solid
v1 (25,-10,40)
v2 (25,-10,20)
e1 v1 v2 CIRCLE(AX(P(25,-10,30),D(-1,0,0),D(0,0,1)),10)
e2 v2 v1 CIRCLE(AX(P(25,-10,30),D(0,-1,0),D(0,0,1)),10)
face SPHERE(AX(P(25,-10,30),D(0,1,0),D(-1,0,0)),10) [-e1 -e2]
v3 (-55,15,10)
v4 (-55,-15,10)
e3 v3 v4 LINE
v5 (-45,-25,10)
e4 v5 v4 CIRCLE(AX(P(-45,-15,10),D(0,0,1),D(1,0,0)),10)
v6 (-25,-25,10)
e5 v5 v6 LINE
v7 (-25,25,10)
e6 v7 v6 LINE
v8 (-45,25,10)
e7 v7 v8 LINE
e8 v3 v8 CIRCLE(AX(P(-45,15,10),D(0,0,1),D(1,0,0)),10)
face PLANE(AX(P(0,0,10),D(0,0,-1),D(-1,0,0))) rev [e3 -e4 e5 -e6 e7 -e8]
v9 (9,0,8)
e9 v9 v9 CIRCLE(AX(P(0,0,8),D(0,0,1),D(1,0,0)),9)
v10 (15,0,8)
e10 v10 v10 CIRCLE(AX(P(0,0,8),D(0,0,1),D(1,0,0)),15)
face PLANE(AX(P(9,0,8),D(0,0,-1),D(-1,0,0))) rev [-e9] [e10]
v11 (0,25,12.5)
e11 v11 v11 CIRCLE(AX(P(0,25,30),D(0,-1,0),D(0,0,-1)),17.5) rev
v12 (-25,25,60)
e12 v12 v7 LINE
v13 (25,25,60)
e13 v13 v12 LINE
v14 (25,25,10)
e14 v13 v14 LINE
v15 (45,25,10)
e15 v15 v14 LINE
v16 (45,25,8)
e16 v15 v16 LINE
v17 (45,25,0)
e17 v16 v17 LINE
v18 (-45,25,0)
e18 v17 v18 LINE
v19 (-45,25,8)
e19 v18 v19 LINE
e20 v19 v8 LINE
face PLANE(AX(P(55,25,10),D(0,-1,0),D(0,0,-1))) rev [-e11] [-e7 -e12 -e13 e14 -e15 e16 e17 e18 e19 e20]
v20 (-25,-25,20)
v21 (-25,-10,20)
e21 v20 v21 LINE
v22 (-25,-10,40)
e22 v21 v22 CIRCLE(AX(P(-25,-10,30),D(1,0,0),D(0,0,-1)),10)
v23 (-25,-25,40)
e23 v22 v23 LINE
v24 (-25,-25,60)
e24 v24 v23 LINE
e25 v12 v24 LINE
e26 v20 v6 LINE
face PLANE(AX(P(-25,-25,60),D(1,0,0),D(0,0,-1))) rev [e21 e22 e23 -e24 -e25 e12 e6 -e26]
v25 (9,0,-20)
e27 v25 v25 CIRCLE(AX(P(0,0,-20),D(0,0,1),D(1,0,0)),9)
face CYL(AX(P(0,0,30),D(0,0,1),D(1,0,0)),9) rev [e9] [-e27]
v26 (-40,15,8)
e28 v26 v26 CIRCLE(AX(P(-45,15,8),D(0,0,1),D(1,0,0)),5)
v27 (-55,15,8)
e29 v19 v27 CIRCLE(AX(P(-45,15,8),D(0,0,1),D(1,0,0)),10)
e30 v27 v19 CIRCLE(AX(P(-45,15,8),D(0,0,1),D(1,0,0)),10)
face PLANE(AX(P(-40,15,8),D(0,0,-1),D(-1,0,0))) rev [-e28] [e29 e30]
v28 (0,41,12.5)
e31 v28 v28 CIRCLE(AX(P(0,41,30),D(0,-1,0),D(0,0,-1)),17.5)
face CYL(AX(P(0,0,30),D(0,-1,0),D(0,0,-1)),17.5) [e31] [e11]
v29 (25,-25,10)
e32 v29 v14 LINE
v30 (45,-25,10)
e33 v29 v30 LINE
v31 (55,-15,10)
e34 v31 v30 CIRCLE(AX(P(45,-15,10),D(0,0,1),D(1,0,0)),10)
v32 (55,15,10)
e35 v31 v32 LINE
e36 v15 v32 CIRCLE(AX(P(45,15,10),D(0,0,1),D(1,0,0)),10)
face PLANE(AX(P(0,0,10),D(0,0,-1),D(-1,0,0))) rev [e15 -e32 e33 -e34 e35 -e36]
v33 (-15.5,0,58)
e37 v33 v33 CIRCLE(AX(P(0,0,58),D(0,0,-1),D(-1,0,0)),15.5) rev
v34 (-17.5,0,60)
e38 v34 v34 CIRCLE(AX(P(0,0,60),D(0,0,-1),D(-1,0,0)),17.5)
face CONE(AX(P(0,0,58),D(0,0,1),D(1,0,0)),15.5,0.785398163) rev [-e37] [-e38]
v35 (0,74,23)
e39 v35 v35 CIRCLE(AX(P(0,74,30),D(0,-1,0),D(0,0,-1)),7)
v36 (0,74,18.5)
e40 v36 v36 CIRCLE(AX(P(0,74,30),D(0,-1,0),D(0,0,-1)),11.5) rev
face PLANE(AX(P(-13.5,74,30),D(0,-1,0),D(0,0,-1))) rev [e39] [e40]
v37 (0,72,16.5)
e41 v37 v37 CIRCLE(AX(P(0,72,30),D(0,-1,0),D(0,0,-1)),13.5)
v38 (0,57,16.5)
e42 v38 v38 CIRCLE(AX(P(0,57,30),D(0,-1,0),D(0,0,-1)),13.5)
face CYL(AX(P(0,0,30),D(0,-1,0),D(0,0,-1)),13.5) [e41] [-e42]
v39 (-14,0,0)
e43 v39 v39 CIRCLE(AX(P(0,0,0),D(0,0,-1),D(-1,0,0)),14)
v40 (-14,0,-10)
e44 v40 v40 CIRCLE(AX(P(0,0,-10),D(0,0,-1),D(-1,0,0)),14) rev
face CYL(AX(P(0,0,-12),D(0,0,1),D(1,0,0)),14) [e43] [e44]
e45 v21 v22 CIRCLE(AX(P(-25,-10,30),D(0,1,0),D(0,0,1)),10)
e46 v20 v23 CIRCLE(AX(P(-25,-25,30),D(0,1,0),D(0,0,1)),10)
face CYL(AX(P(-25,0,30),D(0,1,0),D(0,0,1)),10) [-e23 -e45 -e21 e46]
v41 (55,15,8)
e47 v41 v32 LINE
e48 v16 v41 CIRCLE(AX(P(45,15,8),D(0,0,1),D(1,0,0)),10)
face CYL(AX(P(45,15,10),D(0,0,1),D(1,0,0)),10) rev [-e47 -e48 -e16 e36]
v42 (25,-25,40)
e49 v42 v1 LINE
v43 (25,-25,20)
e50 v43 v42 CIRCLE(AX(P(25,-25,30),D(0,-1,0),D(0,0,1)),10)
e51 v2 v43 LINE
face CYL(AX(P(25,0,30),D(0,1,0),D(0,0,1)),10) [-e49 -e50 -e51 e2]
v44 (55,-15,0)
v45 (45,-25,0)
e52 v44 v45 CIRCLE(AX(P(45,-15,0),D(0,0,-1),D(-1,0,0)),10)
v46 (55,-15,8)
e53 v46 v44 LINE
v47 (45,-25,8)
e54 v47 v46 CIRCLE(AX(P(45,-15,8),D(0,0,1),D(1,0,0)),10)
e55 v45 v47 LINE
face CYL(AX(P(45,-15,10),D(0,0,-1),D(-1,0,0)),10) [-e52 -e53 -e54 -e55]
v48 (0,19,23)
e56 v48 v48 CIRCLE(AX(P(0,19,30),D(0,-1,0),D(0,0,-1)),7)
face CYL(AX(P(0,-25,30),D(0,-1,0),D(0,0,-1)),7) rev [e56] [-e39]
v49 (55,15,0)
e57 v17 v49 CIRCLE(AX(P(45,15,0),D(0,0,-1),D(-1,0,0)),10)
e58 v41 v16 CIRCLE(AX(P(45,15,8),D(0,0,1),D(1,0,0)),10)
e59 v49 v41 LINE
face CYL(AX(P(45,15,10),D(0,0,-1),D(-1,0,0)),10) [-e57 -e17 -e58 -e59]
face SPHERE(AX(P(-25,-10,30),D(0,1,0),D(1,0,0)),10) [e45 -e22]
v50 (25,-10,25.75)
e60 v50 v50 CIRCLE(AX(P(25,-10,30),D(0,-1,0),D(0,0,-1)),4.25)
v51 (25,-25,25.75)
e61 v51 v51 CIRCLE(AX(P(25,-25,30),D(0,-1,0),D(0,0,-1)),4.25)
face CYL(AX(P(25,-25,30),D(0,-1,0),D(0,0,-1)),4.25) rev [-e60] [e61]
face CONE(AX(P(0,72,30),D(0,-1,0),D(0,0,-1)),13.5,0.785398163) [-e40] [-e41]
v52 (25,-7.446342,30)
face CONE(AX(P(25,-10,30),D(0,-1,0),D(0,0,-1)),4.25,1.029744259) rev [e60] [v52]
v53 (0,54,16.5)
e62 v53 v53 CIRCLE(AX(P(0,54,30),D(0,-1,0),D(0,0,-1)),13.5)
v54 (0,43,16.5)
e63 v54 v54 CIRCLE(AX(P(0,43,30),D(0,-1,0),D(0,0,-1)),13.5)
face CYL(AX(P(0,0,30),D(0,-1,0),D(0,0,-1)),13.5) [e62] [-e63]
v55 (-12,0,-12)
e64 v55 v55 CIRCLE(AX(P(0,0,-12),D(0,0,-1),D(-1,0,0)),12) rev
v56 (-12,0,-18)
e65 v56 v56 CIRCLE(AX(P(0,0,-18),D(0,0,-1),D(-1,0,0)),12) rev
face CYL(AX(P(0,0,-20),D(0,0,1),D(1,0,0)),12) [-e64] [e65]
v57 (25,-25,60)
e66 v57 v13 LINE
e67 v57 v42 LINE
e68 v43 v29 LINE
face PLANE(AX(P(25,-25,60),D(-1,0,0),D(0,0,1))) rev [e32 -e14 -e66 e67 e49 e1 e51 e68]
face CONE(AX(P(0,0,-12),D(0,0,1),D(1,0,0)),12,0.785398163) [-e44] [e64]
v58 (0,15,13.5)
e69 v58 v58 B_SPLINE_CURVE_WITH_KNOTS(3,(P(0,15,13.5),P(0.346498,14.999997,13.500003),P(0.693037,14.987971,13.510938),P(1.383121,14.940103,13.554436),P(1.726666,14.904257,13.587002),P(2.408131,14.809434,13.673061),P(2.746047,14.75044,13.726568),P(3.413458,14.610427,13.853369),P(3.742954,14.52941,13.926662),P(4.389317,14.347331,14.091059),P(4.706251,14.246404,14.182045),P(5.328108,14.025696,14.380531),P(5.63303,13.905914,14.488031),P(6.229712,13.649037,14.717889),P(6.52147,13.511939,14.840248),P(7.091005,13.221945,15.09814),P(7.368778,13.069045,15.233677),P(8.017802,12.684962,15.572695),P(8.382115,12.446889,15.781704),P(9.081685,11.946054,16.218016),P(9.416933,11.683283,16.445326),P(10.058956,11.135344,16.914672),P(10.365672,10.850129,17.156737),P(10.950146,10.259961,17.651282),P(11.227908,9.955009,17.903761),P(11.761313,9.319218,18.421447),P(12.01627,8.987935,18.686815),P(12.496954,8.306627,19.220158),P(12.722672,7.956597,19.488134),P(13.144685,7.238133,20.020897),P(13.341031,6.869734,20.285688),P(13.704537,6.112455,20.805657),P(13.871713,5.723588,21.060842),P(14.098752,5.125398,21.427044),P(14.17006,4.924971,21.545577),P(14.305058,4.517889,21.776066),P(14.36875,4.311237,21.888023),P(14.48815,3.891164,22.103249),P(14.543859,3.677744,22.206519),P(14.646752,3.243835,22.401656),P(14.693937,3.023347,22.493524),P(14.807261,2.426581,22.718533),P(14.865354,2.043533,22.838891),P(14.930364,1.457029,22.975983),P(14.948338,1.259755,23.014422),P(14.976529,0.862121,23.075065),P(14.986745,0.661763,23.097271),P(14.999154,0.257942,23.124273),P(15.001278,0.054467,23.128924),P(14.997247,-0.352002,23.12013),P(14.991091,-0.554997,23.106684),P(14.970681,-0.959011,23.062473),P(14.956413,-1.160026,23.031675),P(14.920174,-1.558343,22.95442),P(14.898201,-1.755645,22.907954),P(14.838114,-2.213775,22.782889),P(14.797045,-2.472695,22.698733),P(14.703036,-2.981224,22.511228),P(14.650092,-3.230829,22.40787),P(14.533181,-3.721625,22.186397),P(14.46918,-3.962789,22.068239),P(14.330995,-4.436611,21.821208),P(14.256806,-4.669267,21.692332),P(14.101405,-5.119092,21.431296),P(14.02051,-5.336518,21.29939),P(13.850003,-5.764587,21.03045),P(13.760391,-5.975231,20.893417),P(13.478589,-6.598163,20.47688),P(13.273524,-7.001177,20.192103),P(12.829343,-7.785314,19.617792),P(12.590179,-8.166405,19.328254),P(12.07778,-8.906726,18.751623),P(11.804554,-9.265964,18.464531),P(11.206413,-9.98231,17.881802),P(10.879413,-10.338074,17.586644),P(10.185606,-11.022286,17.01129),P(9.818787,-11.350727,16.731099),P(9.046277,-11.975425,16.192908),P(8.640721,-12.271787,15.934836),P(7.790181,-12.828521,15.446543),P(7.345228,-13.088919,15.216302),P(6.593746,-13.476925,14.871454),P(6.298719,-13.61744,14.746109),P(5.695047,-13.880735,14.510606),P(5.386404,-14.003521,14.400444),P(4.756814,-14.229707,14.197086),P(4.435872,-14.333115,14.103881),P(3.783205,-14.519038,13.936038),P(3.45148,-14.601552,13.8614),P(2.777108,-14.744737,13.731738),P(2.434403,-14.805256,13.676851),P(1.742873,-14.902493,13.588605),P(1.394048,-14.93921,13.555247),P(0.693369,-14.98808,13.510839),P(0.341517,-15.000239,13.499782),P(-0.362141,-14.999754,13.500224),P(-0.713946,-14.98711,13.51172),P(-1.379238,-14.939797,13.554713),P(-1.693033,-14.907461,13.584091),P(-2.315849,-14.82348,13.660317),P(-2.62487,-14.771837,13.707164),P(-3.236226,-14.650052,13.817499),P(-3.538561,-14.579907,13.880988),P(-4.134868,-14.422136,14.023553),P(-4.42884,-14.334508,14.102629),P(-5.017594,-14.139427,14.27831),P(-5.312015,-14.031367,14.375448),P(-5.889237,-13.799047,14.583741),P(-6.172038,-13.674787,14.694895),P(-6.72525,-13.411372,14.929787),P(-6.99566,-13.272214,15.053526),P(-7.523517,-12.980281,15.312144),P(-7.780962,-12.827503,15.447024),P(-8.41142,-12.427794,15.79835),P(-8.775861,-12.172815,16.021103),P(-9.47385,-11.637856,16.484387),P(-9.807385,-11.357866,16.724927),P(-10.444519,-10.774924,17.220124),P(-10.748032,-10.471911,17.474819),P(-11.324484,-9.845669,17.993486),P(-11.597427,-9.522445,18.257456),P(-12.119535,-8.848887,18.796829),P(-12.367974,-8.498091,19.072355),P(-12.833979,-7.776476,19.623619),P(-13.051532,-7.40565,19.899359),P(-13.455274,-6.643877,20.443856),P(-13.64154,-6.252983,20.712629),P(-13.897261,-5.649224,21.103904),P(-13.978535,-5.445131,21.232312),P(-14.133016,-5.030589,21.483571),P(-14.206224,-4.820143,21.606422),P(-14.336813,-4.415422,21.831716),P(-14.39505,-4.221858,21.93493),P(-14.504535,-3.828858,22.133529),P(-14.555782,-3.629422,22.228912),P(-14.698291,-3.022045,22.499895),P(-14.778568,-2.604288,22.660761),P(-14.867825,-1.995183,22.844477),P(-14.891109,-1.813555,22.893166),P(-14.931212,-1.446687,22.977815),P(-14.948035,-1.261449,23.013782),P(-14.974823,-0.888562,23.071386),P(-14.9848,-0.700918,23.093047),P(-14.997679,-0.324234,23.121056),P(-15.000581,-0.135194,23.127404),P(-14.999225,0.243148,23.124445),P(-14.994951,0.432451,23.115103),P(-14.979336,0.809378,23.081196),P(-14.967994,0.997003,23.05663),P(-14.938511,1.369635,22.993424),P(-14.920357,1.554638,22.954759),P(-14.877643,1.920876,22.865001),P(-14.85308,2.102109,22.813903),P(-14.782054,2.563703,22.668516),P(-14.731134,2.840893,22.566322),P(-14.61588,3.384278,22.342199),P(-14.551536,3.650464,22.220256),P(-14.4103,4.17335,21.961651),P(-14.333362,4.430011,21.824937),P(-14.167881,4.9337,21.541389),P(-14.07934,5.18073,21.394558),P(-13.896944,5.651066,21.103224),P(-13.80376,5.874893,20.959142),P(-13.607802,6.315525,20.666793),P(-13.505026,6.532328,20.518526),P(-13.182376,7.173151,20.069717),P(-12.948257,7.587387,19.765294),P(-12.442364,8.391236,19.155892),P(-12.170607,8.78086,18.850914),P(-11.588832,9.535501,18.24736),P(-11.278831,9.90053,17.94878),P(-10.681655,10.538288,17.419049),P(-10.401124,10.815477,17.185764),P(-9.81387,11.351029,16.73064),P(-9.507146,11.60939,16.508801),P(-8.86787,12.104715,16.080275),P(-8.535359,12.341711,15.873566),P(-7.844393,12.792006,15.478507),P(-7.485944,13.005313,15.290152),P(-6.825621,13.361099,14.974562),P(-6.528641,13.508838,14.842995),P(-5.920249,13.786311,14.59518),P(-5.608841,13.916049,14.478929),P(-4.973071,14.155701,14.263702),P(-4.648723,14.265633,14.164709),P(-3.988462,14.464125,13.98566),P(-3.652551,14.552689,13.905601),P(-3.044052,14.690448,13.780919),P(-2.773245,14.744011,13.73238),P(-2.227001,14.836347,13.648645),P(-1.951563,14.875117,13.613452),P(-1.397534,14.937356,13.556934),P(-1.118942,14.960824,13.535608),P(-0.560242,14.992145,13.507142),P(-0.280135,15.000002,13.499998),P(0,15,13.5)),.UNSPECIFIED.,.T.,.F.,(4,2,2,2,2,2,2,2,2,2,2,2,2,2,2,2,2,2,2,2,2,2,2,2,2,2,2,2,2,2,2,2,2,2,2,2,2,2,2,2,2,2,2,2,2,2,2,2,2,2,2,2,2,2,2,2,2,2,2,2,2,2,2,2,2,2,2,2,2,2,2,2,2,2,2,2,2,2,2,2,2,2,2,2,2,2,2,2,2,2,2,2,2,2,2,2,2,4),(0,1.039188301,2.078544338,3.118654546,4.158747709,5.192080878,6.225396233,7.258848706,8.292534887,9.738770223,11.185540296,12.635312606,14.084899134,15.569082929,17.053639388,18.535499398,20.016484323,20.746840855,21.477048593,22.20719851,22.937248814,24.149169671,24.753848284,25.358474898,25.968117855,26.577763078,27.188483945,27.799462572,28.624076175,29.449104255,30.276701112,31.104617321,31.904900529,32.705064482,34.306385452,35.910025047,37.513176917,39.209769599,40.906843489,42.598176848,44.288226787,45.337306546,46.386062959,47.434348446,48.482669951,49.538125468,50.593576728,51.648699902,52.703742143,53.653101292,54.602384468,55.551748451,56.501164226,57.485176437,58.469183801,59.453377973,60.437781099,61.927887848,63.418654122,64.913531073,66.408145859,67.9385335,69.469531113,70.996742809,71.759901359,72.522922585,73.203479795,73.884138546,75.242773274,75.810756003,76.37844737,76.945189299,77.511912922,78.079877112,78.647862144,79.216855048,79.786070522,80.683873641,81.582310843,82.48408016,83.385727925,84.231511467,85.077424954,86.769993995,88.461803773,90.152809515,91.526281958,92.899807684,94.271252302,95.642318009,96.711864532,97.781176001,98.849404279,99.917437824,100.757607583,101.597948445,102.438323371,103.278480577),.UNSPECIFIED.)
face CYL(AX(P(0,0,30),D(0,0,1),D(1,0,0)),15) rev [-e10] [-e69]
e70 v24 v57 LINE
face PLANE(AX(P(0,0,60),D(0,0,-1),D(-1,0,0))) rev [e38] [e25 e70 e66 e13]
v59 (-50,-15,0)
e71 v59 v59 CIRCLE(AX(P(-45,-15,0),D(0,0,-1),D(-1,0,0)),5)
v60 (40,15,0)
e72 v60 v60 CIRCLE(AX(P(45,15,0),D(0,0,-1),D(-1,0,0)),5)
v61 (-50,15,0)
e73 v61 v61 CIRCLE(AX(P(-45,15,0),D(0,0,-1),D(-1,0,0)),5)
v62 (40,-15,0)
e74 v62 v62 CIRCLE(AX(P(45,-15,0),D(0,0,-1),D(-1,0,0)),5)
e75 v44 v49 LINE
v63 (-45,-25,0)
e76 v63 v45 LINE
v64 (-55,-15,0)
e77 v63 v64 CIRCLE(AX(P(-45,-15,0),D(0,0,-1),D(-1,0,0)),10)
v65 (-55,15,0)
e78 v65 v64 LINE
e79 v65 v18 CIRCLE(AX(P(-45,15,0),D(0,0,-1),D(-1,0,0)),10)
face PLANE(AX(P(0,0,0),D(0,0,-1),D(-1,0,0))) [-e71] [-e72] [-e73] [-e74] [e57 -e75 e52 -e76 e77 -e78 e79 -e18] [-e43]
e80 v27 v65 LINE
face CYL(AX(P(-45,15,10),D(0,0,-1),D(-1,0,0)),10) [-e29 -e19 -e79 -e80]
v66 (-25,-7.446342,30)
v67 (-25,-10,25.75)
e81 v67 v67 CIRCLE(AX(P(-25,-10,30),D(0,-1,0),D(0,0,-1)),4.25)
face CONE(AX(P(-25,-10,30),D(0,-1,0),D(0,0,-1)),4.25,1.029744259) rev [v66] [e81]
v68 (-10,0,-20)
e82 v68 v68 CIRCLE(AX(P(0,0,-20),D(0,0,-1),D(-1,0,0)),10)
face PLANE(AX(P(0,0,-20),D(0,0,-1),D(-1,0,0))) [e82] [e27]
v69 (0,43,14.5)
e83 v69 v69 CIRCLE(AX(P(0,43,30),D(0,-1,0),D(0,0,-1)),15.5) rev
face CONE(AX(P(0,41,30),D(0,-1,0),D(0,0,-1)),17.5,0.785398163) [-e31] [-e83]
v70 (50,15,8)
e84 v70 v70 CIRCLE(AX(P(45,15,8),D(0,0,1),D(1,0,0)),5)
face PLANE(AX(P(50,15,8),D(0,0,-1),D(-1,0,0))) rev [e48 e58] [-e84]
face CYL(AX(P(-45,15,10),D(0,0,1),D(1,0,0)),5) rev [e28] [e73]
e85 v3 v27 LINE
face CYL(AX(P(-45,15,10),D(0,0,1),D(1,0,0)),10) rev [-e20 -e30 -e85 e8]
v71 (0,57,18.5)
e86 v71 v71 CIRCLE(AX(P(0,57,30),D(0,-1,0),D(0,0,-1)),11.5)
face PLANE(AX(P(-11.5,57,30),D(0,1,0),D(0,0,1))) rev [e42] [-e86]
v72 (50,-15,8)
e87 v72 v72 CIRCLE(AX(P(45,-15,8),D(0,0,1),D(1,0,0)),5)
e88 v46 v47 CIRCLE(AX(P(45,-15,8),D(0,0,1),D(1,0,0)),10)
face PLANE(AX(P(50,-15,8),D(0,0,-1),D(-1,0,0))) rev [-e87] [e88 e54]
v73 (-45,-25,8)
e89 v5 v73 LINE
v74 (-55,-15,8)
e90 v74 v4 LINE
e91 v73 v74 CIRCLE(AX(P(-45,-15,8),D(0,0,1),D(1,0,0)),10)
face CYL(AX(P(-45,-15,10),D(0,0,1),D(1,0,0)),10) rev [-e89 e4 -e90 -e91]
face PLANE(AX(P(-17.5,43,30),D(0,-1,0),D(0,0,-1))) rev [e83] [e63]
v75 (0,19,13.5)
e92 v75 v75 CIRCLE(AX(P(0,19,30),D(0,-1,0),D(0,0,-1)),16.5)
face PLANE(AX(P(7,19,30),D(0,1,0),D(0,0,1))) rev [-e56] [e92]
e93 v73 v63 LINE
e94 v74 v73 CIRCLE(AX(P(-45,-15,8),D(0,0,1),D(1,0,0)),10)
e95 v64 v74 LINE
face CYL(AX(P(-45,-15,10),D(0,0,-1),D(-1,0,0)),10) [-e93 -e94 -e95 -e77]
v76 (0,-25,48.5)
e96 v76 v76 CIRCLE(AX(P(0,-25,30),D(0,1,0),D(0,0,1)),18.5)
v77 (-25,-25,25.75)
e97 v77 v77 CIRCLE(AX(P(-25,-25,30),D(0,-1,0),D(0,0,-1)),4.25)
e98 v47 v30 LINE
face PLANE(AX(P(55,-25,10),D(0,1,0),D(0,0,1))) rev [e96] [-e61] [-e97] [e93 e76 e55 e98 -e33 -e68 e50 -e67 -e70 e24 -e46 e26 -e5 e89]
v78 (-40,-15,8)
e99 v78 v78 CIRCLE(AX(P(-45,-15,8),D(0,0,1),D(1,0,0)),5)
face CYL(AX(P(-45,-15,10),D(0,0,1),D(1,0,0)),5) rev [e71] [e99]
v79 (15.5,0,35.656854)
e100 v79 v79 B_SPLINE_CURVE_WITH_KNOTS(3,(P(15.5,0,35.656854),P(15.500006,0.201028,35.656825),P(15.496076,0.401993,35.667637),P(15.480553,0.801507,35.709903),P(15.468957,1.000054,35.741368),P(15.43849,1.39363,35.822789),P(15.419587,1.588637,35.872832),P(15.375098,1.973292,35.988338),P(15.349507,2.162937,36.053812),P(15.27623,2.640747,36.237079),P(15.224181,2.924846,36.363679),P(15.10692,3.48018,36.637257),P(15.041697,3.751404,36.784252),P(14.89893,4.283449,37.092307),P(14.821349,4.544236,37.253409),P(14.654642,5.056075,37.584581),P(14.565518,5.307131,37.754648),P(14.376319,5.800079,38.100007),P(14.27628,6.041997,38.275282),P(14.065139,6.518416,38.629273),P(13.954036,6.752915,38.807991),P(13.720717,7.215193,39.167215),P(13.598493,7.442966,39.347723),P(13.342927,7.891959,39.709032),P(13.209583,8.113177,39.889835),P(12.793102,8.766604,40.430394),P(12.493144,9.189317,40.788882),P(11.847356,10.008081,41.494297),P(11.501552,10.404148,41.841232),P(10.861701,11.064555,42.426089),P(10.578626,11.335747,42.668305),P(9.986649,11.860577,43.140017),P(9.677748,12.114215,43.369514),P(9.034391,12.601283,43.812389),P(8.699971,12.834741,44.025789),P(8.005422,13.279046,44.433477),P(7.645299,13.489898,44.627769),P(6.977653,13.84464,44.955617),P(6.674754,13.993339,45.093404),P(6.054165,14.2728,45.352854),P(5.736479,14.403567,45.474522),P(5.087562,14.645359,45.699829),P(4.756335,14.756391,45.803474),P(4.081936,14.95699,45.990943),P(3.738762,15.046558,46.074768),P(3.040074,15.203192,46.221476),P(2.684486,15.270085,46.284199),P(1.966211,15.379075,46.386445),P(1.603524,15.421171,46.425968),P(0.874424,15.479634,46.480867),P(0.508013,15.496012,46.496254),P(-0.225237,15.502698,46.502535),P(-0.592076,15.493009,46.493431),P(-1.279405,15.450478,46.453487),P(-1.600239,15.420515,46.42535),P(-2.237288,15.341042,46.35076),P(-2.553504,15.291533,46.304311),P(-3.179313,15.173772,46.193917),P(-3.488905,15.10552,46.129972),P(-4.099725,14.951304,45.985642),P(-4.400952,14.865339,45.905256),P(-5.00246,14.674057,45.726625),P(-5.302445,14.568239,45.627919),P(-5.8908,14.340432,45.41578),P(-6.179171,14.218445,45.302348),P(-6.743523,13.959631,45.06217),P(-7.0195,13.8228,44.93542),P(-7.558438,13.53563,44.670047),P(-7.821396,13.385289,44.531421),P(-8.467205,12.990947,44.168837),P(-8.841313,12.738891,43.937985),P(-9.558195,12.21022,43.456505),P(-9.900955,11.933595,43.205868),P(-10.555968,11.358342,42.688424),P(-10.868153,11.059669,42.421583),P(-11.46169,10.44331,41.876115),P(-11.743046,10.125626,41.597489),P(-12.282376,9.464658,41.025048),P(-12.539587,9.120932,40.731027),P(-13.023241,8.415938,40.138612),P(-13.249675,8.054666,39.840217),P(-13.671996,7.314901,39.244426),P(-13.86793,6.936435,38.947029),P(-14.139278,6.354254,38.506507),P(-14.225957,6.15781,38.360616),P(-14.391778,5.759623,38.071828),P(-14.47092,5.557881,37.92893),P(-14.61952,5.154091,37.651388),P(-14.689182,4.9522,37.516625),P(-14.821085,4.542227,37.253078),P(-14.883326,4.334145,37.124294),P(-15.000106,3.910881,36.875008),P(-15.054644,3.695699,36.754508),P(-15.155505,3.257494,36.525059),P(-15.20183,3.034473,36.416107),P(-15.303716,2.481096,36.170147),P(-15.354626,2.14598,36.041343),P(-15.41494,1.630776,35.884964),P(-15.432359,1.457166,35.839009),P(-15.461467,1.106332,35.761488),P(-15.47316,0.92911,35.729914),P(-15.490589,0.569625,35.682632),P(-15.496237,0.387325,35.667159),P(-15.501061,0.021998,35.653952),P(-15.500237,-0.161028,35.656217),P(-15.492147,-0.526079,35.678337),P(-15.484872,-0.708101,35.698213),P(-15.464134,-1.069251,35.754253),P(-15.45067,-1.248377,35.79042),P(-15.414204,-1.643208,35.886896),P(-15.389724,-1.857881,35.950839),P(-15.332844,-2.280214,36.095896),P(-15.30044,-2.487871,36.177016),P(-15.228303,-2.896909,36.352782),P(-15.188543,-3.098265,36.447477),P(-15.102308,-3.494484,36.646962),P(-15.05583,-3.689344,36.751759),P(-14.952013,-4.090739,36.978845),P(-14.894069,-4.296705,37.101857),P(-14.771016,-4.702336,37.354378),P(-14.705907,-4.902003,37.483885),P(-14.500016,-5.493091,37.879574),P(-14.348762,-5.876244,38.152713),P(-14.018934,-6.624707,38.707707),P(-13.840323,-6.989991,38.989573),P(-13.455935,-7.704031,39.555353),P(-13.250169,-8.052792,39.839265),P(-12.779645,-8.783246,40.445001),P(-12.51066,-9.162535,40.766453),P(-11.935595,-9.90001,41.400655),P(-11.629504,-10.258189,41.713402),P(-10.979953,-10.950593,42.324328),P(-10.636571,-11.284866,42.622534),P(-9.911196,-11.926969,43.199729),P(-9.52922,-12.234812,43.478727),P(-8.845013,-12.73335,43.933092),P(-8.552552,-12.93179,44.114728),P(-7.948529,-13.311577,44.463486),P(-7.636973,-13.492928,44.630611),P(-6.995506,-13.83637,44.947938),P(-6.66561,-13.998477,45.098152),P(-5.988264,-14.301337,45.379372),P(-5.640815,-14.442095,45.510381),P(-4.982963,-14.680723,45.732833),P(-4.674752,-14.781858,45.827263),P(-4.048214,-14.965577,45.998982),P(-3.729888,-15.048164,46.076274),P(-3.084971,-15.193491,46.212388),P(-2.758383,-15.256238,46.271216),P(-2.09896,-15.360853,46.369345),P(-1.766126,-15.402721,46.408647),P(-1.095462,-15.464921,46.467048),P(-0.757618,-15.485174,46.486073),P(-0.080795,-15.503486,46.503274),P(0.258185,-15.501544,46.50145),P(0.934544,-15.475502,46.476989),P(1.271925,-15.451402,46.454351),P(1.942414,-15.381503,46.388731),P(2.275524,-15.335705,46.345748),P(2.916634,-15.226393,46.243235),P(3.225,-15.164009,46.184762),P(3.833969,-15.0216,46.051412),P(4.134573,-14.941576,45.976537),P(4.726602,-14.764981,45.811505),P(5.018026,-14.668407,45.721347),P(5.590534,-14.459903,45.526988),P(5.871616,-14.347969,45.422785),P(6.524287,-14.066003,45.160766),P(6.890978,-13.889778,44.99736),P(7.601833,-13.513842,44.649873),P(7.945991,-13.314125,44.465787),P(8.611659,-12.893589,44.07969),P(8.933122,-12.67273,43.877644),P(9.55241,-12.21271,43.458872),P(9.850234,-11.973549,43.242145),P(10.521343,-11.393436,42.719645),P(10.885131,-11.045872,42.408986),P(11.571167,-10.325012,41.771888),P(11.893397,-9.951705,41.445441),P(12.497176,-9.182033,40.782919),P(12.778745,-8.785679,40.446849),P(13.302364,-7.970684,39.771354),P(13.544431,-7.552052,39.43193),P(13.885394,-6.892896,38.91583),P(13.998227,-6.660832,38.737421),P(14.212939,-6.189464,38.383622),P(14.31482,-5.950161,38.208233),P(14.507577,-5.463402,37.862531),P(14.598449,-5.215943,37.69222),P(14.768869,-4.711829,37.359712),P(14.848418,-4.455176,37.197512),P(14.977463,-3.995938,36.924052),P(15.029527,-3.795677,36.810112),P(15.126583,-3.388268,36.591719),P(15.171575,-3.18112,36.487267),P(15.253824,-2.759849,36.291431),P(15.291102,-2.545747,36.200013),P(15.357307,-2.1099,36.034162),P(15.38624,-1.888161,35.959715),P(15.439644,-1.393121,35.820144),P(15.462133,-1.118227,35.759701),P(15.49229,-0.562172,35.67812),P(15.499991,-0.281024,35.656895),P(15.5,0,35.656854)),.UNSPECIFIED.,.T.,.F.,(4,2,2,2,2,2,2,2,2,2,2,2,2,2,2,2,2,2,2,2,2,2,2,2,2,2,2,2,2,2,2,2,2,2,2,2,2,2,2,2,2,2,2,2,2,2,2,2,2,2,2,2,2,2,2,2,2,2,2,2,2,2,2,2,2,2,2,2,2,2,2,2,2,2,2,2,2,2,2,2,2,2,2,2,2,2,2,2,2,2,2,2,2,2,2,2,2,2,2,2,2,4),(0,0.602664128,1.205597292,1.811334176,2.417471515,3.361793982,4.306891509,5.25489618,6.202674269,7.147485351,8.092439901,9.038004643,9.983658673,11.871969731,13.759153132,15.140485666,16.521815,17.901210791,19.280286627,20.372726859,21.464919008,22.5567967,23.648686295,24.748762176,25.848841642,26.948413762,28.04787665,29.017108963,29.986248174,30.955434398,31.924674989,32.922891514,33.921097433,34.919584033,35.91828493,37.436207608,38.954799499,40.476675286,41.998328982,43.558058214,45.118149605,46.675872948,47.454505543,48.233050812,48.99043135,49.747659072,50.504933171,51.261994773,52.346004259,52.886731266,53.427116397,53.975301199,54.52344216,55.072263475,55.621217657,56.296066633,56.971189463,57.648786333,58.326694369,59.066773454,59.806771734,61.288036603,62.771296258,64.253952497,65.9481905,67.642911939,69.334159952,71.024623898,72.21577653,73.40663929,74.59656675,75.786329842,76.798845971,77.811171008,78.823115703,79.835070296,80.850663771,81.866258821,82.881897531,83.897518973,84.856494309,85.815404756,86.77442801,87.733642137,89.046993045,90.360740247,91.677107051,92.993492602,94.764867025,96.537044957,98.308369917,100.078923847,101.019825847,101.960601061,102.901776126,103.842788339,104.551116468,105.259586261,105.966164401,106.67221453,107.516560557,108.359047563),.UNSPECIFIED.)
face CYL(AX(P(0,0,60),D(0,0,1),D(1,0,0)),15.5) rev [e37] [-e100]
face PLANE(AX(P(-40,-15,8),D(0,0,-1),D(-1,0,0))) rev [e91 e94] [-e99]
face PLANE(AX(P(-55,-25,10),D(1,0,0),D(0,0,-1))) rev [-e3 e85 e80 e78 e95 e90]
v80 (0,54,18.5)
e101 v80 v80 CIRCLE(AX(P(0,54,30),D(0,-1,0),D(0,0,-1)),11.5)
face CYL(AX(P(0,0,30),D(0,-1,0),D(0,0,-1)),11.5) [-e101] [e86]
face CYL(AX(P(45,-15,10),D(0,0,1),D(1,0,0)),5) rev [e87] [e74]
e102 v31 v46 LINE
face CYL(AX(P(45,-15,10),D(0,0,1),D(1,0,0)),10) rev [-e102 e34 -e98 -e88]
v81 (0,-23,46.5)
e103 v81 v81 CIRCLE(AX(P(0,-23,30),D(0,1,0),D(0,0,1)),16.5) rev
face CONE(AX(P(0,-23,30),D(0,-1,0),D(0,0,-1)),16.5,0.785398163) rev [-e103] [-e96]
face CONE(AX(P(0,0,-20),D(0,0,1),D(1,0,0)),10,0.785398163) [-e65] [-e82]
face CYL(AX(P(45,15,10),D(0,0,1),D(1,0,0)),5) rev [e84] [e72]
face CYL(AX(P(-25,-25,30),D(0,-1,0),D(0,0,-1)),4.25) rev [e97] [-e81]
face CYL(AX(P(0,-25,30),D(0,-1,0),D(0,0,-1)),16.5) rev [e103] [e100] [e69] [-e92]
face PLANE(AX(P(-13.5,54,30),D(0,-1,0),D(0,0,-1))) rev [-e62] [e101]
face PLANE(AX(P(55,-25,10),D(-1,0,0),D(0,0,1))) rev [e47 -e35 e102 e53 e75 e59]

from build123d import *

# Parameters (mm, degrees)
SKETCH1_W                   = 50
SKETCH1_H                   = 110
BOSS_EXTRUDE1_DEPTH         = 10
FILLET1_R                   = 10
SKETCH3_W                   = 50
SKETCH3_H                   = 50
BOSS_EXTRUDE2_DEPTH         = 60
SKETCH4_R                   = 14
BOSS_EXTRUDE3_DEPTH         = 12
SKETCH5_R                   = 12
BOSS_EXTRUDE4_DEPTH         = 20
HOLE1_D                     = 10
HOLE1_CBORE_D               = 20
HOLE1_CBORE_DEPTH           = 2
HOLE2_D                     = 14
HOLE2_CBORE_D               = 33
HOLE2_CBORE_DEPTH           = 44
M33X2_0_TAPPED_HOLE1_REACH  = 124.07
M33X2_0_TAPPED_HOLE1_BORE_R = 15.5
HOLE4_D                     = 18
HOLE4_CBORE_D               = 30
HOLE4_CBORE_DEPTH           = 22
CHAMFER3_SIZE               = 2


with BuildPart() as part:
    # Sketch1 → Boss-Extrude1 (new body)
    with BuildSketch(Plane(origin=(0, 0, 0), x_dir=(0, 1, 0), z_dir=(0, 0, 1))):
        Rectangle(SKETCH1_W, SKETCH1_H)
    extrude(amount=BOSS_EXTRUDE1_DEPTH)

    # Fillet1
    fillet1_edges = [part.edges().sort_by_distance(p)[0] for p in [
        (55, 25, 5),
        (55, -25, 5),
        (-55, -25, 5),
        (-55, 25, 5),
    ]]
    fillet(fillet1_edges, radius=FILLET1_R)

    # Sketch3 → Boss-Extrude2 (add)
    with BuildSketch(Plane(origin=(0, 0, 0), x_dir=(0, 1, 0), z_dir=(0, 0, 1))):
        Rectangle(SKETCH3_W, SKETCH3_H)
    extrude(amount=BOSS_EXTRUDE2_DEPTH)

    # Sketch4 → Boss-Extrude3 (add)
    with BuildSketch(Plane(origin=(0, 0, 0), x_dir=(1, 0, 0), z_dir=(0, 0, -1))):
        with Locations(Location((0, 0, 0), (0, 0, 180))):
            Circle(SKETCH4_R)
    extrude(amount=BOSS_EXTRUDE3_DEPTH)

    # Sketch5 → Boss-Extrude4 (add)
    with BuildSketch(Plane(origin=(0, 0, 0), x_dir=(1, 0, 0), z_dir=(0, 0, -1))):
        with Locations(Location((0, 0, 0), (0, 0, 180))):
            Circle(SKETCH5_R)
    extrude(amount=BOSS_EXTRUDE4_DEPTH)

    # Sketch7 → Revolve1 (revolve)
    with BuildSketch(Plane(origin=(0, 0, 30), x_dir=(0, 1, 0), z_dir=(0, 0, 1)), mode=Mode.PRIVATE) as revolve1_sk:
        Polygon((25, 17.5), (43, 17.5), (43, 13.5), (54, 13.5), (54, 11.5), (57, 11.5), (57, 13.5), (74, 13.5), (74, 0), (25, 0), align=None)
    revolve(revolve1_sk.sketch.rotate(Axis((0, 0, 30), (0, 1, 0)), 270), axis=Axis((0, 0, 30), (0, 1, 0)))

    # Hole1 (through all)
    with Locations(Plane.XY.offset(10)):
        with Locations((-45, -15), (-45, 15)):
            hole1 = CounterBoreHole(HOLE1_D / 2, HOLE1_CBORE_D / 2, HOLE1_CBORE_DEPTH)

    # Mirror1: Hole1 across plane
    add(hole1.mirror(Plane(origin=(0, 0, 0), x_dir=(0, 0, 1), z_dir=(1, 0, 0))), mode=Mode.SUBTRACT)

    # Sketch12 → Revolve2 (revolve)
    with BuildSketch(Plane(origin=(0, 0, 30), x_dir=(0, 1, 0), z_dir=(0, 0, 1))):
        with BuildLine():
            Line((-25, 35), (-10, 35))
            ThreePointArc((-10, 35), (-2.928932188, 32.071067812), (0, 25))
            Line((0, 25), (-25, 25))
            Line((-25, 25), (-25, 35))
        make_face()
    revolve2 = revolve(axis=Axis((-25, 0, 30), (0, -1, 0)))

    # Mirror2: Revolve2 across plane
    add(revolve2.mirror(Plane(origin=(0, 0, 0), x_dir=(0, 0, 1), z_dir=(1, 0, 0))))

    # Hole2 (through all)
    with Locations(Plane.XZ.offset(25)):
        with Locations((0, 30)):
            CounterBoreHole(HOLE2_D / 2, HOLE2_CBORE_D / 2, HOLE2_CBORE_DEPTH)

    # Sketch16 → M10 Tapped Hole1 (revolve, cut)
    with BuildSketch(Plane(origin=(-25, -25, 30), x_dir=(0, 0, -1), z_dir=(1, 0, 0))):
        Polygon((0, 0), (0, 17.553657631), (4.25, 15), (4.25, 0), align=None)
    m10_tapped_hole1 = revolve(axis=Axis((-25, -31.35, 30), (0, 1, 0)), mode=Mode.SUBTRACT)

    # Mirror4: M10 Tapped Hole1 across plane
    add(m10_tapped_hole1.mirror(Plane(origin=(0, 0, 0), x_dir=(0, 0, 1), z_dir=(1, 0, 0))), mode=Mode.SUBTRACT)

    # M33x2.0 Tapped Hole1 bore → M33x2.0 Tapped Hole1 (cut, up to next)
    with BuildSketch(Plane.XY.offset(60), mode=Mode.PRIVATE) as m33x2_0_tapped_hole1_sk1:
        Circle(M33X2_0_TAPPED_HOLE1_BORE_R)
    m33x2_0_tapped_hole1_tool1 = extrude(m33x2_0_tapped_hole1_sk1.sketch, amount=-M33X2_0_TAPPED_HOLE1_REACH, mode=Mode.PRIVATE) & part.part
    add(m33x2_0_tapped_hole1_tool1.solids().sort_by_distance((0, 0, 60))[0], mode=Mode.SUBTRACT)

    # Hole4 (through all)
    with Locations(Plane(origin=(0, 0, 30), x_dir=(0, 1, 0), z_dir=(0, 0, 1))):
        with Locations((0, 0)):
            CounterBoreHole(HOLE4_D / 2, HOLE4_CBORE_D / 2, HOLE4_CBORE_DEPTH)

    # Chamfer3
    chamfer3_edges = [part.edges().sort_by_distance(p)[0] for p in [
        (-16.5, -25, 30),
        (-15.5, 0, 60),
        (14, 0, -12),
        (12, 0, -20),
        (0, 43, 47.5),
        (0, 74, 43.5),
    ]]
    chamfer(chamfer3_edges, length=CHAMFER3_SIZE - 0.0001)  # a hair under: the kernel refuses the full size


solid = part.part
